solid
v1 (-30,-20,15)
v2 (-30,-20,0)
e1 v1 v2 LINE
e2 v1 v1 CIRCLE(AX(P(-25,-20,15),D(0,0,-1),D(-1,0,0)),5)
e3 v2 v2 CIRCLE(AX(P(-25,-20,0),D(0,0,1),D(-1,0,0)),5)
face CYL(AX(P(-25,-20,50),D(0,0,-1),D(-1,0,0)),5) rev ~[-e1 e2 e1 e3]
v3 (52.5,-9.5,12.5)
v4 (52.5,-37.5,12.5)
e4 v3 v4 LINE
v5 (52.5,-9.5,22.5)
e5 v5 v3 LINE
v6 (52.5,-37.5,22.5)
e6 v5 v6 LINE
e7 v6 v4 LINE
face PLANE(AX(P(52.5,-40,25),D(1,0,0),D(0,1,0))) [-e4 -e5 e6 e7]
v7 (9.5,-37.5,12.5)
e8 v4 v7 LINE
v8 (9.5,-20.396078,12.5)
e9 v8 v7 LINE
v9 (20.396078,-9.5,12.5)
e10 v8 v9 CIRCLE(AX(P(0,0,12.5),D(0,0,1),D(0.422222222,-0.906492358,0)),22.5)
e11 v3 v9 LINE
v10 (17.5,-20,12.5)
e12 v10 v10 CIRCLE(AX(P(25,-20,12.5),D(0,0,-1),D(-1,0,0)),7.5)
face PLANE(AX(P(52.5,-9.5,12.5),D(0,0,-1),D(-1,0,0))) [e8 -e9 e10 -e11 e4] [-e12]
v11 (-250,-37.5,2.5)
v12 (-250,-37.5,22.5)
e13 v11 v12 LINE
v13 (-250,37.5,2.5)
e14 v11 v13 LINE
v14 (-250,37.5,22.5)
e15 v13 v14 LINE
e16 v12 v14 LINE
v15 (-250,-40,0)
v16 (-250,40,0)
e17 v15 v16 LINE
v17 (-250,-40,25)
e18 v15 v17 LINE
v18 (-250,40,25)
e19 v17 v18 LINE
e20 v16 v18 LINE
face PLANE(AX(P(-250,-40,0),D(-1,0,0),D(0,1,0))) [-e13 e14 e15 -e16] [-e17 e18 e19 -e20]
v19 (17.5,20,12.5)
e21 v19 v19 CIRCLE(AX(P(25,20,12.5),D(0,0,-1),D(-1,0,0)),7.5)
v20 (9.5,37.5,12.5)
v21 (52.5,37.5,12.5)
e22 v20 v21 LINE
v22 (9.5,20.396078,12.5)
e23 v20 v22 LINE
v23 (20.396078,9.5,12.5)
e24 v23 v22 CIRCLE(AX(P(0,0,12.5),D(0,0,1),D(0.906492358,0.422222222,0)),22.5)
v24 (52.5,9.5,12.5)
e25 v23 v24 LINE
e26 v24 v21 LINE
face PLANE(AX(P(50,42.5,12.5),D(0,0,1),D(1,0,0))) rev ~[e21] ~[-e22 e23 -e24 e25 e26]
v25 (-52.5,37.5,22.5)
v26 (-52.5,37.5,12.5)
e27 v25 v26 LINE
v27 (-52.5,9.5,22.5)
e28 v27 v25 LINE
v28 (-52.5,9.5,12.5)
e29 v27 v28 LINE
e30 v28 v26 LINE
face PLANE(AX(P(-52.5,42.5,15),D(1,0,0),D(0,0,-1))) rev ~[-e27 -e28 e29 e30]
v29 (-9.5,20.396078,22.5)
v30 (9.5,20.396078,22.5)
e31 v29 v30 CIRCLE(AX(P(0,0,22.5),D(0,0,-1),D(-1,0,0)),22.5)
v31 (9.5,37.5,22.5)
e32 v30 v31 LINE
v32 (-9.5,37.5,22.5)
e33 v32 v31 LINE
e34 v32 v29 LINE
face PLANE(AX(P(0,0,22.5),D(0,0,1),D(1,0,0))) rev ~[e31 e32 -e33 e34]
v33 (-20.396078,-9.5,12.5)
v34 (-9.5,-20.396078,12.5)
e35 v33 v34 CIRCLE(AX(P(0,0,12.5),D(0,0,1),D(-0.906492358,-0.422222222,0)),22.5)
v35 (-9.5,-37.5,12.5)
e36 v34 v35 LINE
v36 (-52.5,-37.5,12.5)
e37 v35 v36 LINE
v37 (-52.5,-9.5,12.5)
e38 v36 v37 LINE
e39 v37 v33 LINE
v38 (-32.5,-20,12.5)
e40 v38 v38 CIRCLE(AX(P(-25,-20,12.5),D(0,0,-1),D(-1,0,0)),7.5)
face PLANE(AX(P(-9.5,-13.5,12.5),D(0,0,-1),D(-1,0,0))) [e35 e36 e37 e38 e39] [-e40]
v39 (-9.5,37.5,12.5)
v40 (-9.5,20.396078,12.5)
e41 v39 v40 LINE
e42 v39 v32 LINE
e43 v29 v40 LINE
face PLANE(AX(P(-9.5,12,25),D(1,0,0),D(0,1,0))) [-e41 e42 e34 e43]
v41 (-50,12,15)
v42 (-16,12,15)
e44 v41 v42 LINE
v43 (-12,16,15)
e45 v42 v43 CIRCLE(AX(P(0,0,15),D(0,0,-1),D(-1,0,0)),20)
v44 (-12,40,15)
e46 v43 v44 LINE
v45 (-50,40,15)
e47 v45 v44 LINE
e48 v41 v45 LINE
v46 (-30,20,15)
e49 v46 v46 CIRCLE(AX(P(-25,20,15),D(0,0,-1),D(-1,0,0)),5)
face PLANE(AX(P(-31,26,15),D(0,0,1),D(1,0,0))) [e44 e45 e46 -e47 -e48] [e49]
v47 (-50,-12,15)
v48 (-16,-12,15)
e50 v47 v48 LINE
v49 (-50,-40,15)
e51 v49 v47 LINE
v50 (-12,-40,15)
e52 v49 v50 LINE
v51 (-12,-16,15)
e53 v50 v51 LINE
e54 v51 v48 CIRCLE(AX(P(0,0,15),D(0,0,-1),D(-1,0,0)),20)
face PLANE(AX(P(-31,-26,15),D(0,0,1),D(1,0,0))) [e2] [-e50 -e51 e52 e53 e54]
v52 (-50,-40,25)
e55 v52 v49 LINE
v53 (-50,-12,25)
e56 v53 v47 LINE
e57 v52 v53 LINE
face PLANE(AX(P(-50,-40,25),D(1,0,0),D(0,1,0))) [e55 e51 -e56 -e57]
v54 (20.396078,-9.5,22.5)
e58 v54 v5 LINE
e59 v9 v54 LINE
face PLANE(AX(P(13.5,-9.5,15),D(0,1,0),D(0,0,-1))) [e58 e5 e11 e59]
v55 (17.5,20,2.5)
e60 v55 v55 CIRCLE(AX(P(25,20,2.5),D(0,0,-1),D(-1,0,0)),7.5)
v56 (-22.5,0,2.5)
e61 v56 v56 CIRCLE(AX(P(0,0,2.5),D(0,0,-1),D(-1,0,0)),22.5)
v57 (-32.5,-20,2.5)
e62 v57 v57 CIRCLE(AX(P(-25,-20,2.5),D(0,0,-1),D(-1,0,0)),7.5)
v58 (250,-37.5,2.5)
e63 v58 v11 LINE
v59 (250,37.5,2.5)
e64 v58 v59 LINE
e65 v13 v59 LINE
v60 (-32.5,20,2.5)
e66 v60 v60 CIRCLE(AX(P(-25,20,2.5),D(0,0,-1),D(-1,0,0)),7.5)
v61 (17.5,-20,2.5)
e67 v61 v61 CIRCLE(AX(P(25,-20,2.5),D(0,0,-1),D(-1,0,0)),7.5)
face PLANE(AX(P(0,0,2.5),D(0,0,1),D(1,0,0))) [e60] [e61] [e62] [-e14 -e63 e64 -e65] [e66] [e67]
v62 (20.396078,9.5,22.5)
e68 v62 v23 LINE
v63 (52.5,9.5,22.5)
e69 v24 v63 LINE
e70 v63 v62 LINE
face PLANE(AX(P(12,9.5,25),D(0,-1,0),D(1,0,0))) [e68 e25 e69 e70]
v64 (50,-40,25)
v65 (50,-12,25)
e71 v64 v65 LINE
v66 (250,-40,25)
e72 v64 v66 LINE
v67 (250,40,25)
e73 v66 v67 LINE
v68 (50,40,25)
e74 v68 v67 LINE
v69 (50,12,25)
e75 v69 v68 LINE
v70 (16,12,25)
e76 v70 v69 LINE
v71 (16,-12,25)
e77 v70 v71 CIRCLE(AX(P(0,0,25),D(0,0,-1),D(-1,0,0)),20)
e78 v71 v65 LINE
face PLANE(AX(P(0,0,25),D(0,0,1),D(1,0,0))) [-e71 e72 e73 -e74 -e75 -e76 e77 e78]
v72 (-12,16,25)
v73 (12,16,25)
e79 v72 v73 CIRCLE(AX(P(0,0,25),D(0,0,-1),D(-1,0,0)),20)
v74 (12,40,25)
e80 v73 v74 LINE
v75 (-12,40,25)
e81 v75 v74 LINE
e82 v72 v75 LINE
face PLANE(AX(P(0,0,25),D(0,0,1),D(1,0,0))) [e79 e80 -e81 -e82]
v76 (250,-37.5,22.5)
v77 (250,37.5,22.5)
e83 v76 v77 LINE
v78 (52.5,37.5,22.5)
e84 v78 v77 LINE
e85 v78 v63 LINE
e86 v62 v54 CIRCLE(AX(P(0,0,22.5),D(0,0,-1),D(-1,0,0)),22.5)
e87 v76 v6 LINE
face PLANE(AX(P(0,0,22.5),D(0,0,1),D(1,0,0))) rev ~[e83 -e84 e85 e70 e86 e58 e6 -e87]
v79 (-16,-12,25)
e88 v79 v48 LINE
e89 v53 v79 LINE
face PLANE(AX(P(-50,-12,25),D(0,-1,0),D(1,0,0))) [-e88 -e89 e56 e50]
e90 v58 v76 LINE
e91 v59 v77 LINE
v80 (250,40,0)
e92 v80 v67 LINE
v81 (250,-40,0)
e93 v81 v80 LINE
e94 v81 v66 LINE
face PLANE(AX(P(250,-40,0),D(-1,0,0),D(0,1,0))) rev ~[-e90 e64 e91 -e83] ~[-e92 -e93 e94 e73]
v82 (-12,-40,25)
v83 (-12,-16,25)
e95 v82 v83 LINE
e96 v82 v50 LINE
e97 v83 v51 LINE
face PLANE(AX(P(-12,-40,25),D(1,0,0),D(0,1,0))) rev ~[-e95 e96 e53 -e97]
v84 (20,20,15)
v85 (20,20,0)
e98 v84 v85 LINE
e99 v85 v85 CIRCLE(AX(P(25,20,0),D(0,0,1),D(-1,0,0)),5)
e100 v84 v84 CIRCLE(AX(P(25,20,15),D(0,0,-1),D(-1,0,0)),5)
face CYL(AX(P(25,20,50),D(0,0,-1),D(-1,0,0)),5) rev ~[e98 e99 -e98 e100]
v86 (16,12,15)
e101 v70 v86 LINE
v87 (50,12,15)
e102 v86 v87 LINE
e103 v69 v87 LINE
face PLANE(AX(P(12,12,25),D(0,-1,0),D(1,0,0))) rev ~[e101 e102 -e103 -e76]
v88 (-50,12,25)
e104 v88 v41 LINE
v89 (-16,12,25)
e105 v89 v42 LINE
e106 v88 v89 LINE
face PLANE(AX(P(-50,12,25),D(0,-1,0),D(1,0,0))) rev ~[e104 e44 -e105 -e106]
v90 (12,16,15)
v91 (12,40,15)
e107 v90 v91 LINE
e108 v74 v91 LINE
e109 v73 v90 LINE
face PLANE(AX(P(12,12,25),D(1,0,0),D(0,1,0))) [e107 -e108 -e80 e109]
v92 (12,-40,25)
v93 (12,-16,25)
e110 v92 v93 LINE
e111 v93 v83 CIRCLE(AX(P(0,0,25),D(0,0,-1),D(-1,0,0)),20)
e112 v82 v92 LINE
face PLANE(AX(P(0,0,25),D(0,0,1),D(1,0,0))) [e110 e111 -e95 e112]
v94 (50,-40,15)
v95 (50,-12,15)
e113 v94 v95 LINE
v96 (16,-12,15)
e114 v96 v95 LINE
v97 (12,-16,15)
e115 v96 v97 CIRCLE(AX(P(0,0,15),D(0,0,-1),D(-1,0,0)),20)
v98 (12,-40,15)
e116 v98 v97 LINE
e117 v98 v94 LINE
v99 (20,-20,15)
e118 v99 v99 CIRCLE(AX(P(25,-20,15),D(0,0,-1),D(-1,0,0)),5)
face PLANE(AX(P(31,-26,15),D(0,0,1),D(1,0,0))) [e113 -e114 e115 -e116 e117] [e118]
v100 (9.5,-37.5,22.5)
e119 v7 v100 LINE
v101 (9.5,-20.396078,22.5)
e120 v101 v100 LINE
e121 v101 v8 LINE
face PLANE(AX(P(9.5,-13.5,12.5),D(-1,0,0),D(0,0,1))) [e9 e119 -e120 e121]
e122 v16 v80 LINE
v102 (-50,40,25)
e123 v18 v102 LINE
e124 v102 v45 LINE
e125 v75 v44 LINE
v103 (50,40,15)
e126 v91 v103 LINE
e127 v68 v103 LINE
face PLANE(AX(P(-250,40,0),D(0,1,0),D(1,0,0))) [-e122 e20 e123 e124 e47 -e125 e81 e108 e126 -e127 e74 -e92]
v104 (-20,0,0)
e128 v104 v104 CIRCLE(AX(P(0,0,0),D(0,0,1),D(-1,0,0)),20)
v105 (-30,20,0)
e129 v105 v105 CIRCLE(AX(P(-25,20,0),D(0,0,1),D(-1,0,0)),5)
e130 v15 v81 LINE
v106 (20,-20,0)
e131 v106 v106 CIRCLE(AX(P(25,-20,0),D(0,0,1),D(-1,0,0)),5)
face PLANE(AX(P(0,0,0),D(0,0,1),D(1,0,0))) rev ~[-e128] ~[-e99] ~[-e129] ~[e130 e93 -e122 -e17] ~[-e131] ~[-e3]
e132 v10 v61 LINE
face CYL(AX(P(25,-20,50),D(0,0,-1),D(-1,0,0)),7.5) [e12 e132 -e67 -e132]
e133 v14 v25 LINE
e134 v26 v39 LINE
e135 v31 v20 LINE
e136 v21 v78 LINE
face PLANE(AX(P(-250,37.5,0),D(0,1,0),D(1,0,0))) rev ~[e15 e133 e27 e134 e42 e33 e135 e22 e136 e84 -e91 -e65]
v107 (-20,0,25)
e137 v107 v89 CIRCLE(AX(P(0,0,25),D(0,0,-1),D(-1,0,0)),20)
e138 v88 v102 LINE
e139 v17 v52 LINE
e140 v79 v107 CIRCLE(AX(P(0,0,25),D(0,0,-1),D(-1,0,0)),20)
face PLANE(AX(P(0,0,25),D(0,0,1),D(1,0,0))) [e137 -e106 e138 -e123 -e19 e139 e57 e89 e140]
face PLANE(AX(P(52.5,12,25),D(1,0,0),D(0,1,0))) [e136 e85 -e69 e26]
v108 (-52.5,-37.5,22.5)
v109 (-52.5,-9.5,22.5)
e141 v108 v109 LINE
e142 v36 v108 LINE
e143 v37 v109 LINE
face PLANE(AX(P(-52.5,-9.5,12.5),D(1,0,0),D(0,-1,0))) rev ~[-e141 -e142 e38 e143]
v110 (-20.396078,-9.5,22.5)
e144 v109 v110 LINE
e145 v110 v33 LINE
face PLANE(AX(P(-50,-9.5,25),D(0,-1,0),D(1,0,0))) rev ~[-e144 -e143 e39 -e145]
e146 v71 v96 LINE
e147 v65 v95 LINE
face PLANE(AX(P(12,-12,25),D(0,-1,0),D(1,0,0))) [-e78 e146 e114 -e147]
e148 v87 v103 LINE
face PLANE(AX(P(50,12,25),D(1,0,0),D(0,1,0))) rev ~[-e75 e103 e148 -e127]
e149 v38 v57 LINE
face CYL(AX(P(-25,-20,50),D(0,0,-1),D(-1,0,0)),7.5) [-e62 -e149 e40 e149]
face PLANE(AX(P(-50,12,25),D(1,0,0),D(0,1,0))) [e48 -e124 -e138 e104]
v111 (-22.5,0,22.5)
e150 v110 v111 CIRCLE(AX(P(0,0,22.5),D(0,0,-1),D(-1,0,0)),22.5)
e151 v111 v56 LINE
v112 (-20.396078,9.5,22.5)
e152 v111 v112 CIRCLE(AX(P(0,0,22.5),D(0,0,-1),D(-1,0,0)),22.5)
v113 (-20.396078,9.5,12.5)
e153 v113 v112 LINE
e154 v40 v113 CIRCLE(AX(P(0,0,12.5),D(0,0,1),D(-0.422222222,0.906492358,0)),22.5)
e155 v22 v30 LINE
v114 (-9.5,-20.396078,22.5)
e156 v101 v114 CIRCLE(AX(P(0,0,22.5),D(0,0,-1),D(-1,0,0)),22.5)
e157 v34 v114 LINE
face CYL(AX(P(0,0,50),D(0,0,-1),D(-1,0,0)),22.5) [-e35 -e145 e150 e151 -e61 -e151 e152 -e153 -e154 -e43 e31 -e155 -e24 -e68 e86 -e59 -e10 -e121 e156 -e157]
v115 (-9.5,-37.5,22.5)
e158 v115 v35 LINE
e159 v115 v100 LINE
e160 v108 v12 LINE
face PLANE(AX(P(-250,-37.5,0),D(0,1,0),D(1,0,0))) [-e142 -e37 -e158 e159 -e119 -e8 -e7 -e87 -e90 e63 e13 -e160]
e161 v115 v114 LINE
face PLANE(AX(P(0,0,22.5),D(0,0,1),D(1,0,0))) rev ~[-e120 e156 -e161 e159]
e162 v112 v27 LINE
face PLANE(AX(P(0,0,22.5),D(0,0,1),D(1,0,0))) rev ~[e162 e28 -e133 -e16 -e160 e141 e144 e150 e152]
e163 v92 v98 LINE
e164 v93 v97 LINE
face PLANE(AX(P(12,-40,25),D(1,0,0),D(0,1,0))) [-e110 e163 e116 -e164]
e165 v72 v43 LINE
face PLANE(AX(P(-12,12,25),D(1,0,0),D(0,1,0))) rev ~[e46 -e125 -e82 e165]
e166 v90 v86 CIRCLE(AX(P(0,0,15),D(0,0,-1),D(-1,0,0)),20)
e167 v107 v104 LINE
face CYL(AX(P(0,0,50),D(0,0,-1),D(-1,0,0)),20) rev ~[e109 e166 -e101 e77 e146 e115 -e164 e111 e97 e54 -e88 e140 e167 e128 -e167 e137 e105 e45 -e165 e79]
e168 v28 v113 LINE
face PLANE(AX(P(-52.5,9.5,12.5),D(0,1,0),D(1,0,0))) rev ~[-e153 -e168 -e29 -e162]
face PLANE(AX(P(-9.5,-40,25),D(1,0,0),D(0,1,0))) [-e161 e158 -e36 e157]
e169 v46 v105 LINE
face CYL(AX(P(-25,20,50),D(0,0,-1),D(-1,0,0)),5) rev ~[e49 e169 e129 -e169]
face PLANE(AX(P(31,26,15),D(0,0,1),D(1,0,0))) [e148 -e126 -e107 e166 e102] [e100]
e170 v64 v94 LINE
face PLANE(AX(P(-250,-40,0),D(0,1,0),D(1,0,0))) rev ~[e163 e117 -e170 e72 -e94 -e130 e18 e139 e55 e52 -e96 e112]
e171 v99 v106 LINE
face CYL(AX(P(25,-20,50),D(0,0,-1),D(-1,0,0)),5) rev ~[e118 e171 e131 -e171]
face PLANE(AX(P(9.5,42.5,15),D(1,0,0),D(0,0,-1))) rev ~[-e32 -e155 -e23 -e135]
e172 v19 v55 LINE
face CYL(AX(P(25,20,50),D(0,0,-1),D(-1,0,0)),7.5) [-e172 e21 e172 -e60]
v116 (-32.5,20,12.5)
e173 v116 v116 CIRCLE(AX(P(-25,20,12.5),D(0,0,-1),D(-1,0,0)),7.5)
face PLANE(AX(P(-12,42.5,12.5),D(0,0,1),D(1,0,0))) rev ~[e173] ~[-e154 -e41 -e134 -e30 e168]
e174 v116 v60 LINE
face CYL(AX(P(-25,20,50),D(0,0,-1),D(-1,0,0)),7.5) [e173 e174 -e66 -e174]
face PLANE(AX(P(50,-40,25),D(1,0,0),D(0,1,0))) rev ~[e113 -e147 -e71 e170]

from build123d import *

# Parameters (mm, degrees)
F0_W         = 500
F0_H         = 80
F1_DEPTH     = 25
F3_D         = 40
F3_DEPTH     = 25
F3_TIP       = 12.0172123806
F4_D         = 10
F4_DEPTH     = 25
F4_TIP       = 3.0043030951
F2_W         = 38
F2_H         = 28
F5_DEPTH     = 10
F6_T         = 2.5
F6_T3_DEPTH  = 15
F6_T5_DEPTH  = 33
F6_T7_DEPTH  = 29
F6_T9_DEPTH  = 39
F6_T11_DEPTH = 39
F6_T13_DEPTH = 33
F6_T15_DEPTH = 29


# Not quite as in the source:
# - a shell that OpenCascade refuses in one call is made with other operations: the cavity is built on its own and cut out


with BuildPart() as f1:
    # F0 (on Top) → F1 (new body)
    with BuildSketch(Plane.XY):
        Rectangle(F0_W, F0_H)
    extrude(amount=F1_DEPTH)

    # F3
    with Locations(Plane.XY.offset(25)):
        with Locations((0, 0)):
            Hole(F3_D / 2, depth=F3_DEPTH)
            with Locations((0, 0, -(F3_DEPTH + F3_TIP / 2))):  # 118° drill point
                Cone(0, F3_D / 2, F3_TIP, mode=Mode.SUBTRACT)

    # F4
    with Locations(Plane.XY.offset(25)):
        with Locations((-25, 20), (25, 20), (25, -20), (-25, -20)):
            Hole(F4_D / 2, depth=F4_DEPTH)
            with Locations((0, 0, -(F4_DEPTH + F4_TIP / 2))):  # 118° drill point
                Cone(0, F4_D / 2, F4_TIP, mode=Mode.SUBTRACT)

    # F2 (on face) → F5 (cut)
    with BuildSketch(Plane.XY.offset(25)):
        with Locations((-31, -26)):
            Rectangle(F2_W, F2_H)
        with Locations((-31, 26)):
            Rectangle(F2_W, F2_H)
        with Locations((31, 26)):
            Rectangle(F2_W, F2_H)
        with Locations((31, -26)):
            Rectangle(F2_W, F2_H)
    extrude(amount=-F5_DEPTH, mode=Mode.SUBTRACT)

    # F6: shell of thickness 2.5, made by hand


with BuildPart() as f6_core1:
    # F6_t2: copy of F1
    add(f1.part)

    # the walls: a layer under each face that stays
    f6_faces = [f6_core1.faces().sort_by_distance(p)[0] for p in [
        (0, 40, 12.5),
        (-166.6666666667, -26.6666666667, 0),
        (-133, 0, 25),
        (-50, 26, 20),
        (-31, 26, 15),
        (-12, 28, 20),
        (0, 28, 25),
        (12, 28, 20),
        (31, 26, 15),
        (50, 26, 20),
        (133, 0, 25),
        (0, -40, 12.5),
        (-30, -20, 7.5),
        (20, -20, 7.5),
        (-30, 20, 7.5),
        (-20, 0, 12.5),
        (20, 20, 7.5),
        (-33, 12, 20),
        (-33, -12, 20),
        (-50, -26, 20),
        (33, 12, 20),
        (50, -26, 20),
        (33, -12, 20),
        (31, -26, 15),
        (12, -28, 20),
        (0, -28, 25),
        (-12, -28, 20),
        (-31, -26, 15),
    ]]
    thicken(f6_faces, amount=-F6_T, mode=Mode.SUBTRACT)

    # F6_s4 → F6_t3 (cut)
    with BuildSketch(Plane.XY.offset(12.5)):
        Polygon((-49.975, 12.025), (-52.5, 12), (-52.5, 9.5), (-50, 9.5), align=None)
        Polygon((49.975, 12.025), (52.5, 12), (52.5, 9.5), (50, 9.5), align=None)
        Polygon((-49.975, -12.025), (-50, -9.5), (-52.5, -9.5), (-52.5, -12), align=None)
        Polygon((49.975, -12.025), (52.5, -12), (52.5, -9.5), (50, -9.5), align=None)
    extrude(amount=F6_T3_DEPTH, mode=Mode.SUBTRACT)

    # F6_s6 → F6_t5 (cut)
    with BuildSketch(Plane.XZ.offset(-42.5)):
        Polygon((-49.975, 15.025), (-52.5, 15), (-52.5, 12.5), (-50, 12.5), align=None)
        Polygon((49.975, 15.025), (50, 12.5), (52.5, 12.5), (52.5, 15), align=None)
    extrude(amount=F6_T5_DEPTH, mode=Mode.SUBTRACT)

    # F6_s8 → F6_t7 (cut)
    with BuildSketch(Plane.XZ.offset(-42.5)):
        Polygon((-12.025, 15.025), (-12, 12.5), (-9.5, 12.5), (-9.5, 15), align=None)
        Polygon((12.025, 15.025), (9.5, 15), (9.5, 12.5), (12, 12.5), align=None)
    extrude(amount=F6_T7_DEPTH, mode=Mode.SUBTRACT)

    # F6_s10 → F6_t9 (cut)
    with BuildSketch(Plane.YZ.offset(-52.5)):
        Polygon((12.025, 15.025), (12, 12.5), (9.5, 12.5), (9.5, 15), align=None)
        Polygon((-12.025, 15.025), (-9.5, 15), (-9.5, 12.5), (-12, 12.5), align=None)
    extrude(amount=F6_T9_DEPTH, mode=Mode.SUBTRACT)

    # F6_s12 → F6_t11 (cut)
    with BuildSketch(Plane.YZ.offset(13.5)):
        Polygon((12.025, 15.025), (12, 12.5), (9.5, 12.5), (9.5, 15), align=None)
        Polygon((-12.025, 15.025), (-9.5, 15), (-9.5, 12.5), (-12, 12.5), align=None)
    extrude(amount=F6_T11_DEPTH, mode=Mode.SUBTRACT)

    # F6_s14 → F6_t13 (cut)
    with BuildSketch(Plane.XZ.offset(9.5)):
        Polygon((-49.975, 15.025), (-52.5, 15), (-52.5, 12.5), (-50, 12.5), align=None)
        Polygon((49.975, 15.025), (52.5, 15), (52.5, 12.5), (50, 12.5), align=None)
    extrude(amount=F6_T13_DEPTH, mode=Mode.SUBTRACT)

    # F6_s16 → F6_t15 (cut)
    with BuildSketch(Plane.XZ.offset(13.5)):
        Polygon((12.025, 15.025), (12, 12.5), (9.5, 12.5), (9.5, 15), align=None)
        Polygon((-12.025, 15.025), (-9.5, 15), (-9.5, 12.5), (-12, 12.5), align=None)
    extrude(amount=F6_T15_DEPTH, mode=Mode.SUBTRACT)


with BuildPart() as f1_1:
    add(f1.part)

    # what is left inside the walls is the cavity
    f6_cavity = [f6_core1.part.solids().sort_by_distance(p)[0] for p in [
        (-125, 12.5, 2.525),
    ]]
    add(f6_cavity, mode=Mode.SUBTRACT)


solid = f1_1.part
